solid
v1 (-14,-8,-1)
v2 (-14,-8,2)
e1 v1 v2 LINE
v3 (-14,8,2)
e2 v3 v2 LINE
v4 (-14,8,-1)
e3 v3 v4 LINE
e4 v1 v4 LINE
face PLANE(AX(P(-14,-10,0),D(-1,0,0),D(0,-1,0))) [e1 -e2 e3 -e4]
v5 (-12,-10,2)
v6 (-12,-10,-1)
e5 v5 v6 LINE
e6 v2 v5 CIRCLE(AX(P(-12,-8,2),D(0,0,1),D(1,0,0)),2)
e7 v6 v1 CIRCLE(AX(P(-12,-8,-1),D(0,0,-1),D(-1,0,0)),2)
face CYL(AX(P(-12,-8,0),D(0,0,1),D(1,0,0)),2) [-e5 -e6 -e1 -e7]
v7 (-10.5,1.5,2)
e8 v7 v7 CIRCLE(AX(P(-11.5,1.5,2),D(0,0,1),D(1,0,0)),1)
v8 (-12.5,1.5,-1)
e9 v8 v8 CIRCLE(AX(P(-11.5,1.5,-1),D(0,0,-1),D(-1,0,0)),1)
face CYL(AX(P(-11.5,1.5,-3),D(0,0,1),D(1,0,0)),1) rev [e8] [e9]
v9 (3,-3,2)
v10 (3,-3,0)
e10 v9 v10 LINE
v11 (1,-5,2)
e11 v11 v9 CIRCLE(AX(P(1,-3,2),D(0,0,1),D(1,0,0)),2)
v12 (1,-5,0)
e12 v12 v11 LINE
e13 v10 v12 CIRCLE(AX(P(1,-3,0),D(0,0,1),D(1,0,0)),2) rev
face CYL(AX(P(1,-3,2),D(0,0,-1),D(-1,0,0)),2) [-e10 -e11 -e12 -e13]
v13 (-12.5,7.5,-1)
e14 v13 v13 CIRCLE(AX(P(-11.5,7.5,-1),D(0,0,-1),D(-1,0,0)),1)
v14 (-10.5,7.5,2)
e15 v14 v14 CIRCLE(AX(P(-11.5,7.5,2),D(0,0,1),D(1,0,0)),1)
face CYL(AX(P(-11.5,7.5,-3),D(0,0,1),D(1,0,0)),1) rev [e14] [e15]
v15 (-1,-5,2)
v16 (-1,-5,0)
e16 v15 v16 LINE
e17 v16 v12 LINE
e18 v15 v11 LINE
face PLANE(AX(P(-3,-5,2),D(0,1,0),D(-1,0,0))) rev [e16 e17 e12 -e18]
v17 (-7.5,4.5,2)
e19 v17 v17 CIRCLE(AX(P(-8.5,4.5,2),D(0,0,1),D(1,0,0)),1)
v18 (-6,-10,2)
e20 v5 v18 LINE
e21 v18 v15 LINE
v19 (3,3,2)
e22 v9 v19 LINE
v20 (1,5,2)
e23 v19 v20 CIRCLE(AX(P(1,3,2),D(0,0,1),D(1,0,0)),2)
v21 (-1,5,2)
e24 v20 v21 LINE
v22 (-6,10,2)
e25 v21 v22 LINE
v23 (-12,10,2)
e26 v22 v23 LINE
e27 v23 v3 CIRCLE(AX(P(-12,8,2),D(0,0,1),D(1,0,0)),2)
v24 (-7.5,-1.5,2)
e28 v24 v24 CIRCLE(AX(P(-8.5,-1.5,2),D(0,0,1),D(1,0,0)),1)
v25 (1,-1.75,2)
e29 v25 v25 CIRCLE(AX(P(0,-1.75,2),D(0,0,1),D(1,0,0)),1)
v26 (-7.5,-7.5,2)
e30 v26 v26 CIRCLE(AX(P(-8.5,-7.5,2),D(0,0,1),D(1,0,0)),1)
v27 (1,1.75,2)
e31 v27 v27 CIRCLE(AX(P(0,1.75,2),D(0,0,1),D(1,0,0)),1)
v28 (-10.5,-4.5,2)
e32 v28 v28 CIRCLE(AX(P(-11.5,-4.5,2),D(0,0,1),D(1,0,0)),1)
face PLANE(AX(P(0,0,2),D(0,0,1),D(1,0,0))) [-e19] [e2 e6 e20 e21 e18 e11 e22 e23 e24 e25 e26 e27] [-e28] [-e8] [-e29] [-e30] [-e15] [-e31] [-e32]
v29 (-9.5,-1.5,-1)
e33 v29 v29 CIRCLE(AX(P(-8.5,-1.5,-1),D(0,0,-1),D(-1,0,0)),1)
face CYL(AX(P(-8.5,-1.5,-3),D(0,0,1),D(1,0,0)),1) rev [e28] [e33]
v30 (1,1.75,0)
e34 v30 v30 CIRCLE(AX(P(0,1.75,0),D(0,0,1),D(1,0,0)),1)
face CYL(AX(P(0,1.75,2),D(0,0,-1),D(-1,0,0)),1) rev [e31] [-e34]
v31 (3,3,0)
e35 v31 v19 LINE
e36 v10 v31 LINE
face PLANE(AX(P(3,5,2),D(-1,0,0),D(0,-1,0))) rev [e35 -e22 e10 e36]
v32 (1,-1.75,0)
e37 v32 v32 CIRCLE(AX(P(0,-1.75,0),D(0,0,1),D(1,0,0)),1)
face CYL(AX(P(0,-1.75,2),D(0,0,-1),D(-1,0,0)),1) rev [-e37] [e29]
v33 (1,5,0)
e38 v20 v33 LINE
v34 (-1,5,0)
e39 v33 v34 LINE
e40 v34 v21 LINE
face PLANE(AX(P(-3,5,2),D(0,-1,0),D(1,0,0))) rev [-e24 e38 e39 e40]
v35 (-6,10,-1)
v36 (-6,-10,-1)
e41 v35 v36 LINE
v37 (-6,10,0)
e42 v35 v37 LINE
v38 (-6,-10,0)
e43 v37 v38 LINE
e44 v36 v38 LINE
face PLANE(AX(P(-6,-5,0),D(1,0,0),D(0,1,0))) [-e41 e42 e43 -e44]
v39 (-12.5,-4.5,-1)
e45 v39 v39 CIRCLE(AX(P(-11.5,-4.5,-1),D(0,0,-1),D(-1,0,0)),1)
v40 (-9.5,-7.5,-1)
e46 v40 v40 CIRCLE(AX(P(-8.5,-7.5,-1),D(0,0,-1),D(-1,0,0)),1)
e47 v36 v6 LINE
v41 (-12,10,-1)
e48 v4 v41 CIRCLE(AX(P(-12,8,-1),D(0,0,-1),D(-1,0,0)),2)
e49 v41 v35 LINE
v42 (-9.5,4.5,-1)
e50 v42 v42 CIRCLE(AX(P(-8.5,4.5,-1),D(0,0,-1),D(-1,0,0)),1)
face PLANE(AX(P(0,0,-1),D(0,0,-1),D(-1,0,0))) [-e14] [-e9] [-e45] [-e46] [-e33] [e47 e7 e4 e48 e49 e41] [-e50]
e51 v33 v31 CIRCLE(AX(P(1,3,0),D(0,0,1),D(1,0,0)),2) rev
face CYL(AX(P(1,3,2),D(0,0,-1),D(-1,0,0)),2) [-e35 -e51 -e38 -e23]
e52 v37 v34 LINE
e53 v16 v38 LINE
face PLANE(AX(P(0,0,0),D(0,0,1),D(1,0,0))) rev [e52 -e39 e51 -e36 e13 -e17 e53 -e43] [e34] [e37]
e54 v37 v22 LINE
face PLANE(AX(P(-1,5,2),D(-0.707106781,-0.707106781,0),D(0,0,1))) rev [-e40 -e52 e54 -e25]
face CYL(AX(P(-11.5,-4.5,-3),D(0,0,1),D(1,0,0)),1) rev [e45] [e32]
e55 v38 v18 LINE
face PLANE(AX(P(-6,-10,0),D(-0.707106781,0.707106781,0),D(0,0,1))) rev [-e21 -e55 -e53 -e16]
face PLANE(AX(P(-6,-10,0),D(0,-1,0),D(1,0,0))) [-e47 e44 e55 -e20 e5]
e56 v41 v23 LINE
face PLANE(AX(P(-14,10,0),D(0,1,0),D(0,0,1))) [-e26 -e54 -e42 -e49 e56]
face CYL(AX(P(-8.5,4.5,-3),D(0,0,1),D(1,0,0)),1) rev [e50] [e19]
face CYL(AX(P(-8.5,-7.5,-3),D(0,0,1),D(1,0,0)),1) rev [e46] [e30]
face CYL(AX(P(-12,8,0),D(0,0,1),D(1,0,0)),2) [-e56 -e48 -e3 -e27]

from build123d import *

# Parameters (mm, degrees)
SKETCH1_W           = 6
SKETCH1_H           = 10
SKETCH1_R           = 1
BOSS_EXTRUDE1_DEPTH = 2
BOSS_EXTRUDE2_DEPTH = 2
SKETCH3_W           = 8
SKETCH3_H           = 20
BOSS_EXTRUDE3_DEPTH = 1
SKETCH4_R           = 1
CUT_EXTRUDE1_DEPTH  = 5
LPATTERN1_COUNT     = 3
LPATTERN1_PITCH     = 6
CHAMFER1_SIZE       = 5
FILLET1_R           = 2


with BuildPart() as part:
    # Sketch1 → Boss-Extrude1 (new body)
    with BuildSketch(Plane.XY):
        Rectangle(SKETCH1_W, SKETCH1_H)
        with Locations((0, 1.75)):
            Circle(SKETCH1_R, mode=Mode.SUBTRACT)
        with Locations((0, -1.75)):
            Circle(SKETCH1_R, mode=Mode.SUBTRACT)
    extrude(amount=BOSS_EXTRUDE1_DEPTH)

    # Sketch2 → Boss-Extrude2 (add)
    with BuildSketch(Plane.XY.offset(2)):
        Polygon((-14, -10), (-14, 10), (-6, 10), (-6, 5), (-3, 5), (-3, -5), (-6, -5), (-6, -10), align=None)
    extrude(amount=-BOSS_EXTRUDE2_DEPTH)

    # Sketch3 → Boss-Extrude3 (add)
    with BuildSketch(Plane(origin=(0, 0, 0), x_dir=(-1, 0, 0), z_dir=(0, 0, -1))):
        with Locations((10, 0)):
            Rectangle(SKETCH3_W, SKETCH3_H)
    extrude(amount=BOSS_EXTRUDE3_DEPTH)

    # Sketch4 → Cut-Extrude1 (cut)
    with BuildSketch(Plane.XY.offset(2)):
        with Locations((-8.5, -7.5)):
            Circle(SKETCH4_R)
        with Locations((-11.5, -4.5)):
            Circle(SKETCH4_R)
    cut_extrude1 = extrude(amount=-CUT_EXTRUDE1_DEPTH, mode=Mode.SUBTRACT)

    # LPattern1: Cut-Extrude1 ×3
    with Locations(*[(0, i * LPATTERN1_PITCH, 0) for i in range(1, LPATTERN1_COUNT)]):
        add(cut_extrude1, mode=Mode.SUBTRACT)

    # Chamfer1
    chamfer1_edges = [part.edges().sort_by_distance(p)[0] for p in [
        (-6, 5, 1),
        (-6, -5, 1),
    ]]
    chamfer(chamfer1_edges, length=CHAMFER1_SIZE - 0.0001)  # a hair under: the kernel refuses the full size

    # Fillet1
    fillet1_edges = [part.edges().sort_by_distance(p)[0] for p in [
        (-14, -10, 0.5),
        (-14, 10, 0.5),
        (3, -5, 1),
        (3, 5, 1),
    ]]
    fillet(fillet1_edges, radius=FILLET1_R)


solid = part.part
